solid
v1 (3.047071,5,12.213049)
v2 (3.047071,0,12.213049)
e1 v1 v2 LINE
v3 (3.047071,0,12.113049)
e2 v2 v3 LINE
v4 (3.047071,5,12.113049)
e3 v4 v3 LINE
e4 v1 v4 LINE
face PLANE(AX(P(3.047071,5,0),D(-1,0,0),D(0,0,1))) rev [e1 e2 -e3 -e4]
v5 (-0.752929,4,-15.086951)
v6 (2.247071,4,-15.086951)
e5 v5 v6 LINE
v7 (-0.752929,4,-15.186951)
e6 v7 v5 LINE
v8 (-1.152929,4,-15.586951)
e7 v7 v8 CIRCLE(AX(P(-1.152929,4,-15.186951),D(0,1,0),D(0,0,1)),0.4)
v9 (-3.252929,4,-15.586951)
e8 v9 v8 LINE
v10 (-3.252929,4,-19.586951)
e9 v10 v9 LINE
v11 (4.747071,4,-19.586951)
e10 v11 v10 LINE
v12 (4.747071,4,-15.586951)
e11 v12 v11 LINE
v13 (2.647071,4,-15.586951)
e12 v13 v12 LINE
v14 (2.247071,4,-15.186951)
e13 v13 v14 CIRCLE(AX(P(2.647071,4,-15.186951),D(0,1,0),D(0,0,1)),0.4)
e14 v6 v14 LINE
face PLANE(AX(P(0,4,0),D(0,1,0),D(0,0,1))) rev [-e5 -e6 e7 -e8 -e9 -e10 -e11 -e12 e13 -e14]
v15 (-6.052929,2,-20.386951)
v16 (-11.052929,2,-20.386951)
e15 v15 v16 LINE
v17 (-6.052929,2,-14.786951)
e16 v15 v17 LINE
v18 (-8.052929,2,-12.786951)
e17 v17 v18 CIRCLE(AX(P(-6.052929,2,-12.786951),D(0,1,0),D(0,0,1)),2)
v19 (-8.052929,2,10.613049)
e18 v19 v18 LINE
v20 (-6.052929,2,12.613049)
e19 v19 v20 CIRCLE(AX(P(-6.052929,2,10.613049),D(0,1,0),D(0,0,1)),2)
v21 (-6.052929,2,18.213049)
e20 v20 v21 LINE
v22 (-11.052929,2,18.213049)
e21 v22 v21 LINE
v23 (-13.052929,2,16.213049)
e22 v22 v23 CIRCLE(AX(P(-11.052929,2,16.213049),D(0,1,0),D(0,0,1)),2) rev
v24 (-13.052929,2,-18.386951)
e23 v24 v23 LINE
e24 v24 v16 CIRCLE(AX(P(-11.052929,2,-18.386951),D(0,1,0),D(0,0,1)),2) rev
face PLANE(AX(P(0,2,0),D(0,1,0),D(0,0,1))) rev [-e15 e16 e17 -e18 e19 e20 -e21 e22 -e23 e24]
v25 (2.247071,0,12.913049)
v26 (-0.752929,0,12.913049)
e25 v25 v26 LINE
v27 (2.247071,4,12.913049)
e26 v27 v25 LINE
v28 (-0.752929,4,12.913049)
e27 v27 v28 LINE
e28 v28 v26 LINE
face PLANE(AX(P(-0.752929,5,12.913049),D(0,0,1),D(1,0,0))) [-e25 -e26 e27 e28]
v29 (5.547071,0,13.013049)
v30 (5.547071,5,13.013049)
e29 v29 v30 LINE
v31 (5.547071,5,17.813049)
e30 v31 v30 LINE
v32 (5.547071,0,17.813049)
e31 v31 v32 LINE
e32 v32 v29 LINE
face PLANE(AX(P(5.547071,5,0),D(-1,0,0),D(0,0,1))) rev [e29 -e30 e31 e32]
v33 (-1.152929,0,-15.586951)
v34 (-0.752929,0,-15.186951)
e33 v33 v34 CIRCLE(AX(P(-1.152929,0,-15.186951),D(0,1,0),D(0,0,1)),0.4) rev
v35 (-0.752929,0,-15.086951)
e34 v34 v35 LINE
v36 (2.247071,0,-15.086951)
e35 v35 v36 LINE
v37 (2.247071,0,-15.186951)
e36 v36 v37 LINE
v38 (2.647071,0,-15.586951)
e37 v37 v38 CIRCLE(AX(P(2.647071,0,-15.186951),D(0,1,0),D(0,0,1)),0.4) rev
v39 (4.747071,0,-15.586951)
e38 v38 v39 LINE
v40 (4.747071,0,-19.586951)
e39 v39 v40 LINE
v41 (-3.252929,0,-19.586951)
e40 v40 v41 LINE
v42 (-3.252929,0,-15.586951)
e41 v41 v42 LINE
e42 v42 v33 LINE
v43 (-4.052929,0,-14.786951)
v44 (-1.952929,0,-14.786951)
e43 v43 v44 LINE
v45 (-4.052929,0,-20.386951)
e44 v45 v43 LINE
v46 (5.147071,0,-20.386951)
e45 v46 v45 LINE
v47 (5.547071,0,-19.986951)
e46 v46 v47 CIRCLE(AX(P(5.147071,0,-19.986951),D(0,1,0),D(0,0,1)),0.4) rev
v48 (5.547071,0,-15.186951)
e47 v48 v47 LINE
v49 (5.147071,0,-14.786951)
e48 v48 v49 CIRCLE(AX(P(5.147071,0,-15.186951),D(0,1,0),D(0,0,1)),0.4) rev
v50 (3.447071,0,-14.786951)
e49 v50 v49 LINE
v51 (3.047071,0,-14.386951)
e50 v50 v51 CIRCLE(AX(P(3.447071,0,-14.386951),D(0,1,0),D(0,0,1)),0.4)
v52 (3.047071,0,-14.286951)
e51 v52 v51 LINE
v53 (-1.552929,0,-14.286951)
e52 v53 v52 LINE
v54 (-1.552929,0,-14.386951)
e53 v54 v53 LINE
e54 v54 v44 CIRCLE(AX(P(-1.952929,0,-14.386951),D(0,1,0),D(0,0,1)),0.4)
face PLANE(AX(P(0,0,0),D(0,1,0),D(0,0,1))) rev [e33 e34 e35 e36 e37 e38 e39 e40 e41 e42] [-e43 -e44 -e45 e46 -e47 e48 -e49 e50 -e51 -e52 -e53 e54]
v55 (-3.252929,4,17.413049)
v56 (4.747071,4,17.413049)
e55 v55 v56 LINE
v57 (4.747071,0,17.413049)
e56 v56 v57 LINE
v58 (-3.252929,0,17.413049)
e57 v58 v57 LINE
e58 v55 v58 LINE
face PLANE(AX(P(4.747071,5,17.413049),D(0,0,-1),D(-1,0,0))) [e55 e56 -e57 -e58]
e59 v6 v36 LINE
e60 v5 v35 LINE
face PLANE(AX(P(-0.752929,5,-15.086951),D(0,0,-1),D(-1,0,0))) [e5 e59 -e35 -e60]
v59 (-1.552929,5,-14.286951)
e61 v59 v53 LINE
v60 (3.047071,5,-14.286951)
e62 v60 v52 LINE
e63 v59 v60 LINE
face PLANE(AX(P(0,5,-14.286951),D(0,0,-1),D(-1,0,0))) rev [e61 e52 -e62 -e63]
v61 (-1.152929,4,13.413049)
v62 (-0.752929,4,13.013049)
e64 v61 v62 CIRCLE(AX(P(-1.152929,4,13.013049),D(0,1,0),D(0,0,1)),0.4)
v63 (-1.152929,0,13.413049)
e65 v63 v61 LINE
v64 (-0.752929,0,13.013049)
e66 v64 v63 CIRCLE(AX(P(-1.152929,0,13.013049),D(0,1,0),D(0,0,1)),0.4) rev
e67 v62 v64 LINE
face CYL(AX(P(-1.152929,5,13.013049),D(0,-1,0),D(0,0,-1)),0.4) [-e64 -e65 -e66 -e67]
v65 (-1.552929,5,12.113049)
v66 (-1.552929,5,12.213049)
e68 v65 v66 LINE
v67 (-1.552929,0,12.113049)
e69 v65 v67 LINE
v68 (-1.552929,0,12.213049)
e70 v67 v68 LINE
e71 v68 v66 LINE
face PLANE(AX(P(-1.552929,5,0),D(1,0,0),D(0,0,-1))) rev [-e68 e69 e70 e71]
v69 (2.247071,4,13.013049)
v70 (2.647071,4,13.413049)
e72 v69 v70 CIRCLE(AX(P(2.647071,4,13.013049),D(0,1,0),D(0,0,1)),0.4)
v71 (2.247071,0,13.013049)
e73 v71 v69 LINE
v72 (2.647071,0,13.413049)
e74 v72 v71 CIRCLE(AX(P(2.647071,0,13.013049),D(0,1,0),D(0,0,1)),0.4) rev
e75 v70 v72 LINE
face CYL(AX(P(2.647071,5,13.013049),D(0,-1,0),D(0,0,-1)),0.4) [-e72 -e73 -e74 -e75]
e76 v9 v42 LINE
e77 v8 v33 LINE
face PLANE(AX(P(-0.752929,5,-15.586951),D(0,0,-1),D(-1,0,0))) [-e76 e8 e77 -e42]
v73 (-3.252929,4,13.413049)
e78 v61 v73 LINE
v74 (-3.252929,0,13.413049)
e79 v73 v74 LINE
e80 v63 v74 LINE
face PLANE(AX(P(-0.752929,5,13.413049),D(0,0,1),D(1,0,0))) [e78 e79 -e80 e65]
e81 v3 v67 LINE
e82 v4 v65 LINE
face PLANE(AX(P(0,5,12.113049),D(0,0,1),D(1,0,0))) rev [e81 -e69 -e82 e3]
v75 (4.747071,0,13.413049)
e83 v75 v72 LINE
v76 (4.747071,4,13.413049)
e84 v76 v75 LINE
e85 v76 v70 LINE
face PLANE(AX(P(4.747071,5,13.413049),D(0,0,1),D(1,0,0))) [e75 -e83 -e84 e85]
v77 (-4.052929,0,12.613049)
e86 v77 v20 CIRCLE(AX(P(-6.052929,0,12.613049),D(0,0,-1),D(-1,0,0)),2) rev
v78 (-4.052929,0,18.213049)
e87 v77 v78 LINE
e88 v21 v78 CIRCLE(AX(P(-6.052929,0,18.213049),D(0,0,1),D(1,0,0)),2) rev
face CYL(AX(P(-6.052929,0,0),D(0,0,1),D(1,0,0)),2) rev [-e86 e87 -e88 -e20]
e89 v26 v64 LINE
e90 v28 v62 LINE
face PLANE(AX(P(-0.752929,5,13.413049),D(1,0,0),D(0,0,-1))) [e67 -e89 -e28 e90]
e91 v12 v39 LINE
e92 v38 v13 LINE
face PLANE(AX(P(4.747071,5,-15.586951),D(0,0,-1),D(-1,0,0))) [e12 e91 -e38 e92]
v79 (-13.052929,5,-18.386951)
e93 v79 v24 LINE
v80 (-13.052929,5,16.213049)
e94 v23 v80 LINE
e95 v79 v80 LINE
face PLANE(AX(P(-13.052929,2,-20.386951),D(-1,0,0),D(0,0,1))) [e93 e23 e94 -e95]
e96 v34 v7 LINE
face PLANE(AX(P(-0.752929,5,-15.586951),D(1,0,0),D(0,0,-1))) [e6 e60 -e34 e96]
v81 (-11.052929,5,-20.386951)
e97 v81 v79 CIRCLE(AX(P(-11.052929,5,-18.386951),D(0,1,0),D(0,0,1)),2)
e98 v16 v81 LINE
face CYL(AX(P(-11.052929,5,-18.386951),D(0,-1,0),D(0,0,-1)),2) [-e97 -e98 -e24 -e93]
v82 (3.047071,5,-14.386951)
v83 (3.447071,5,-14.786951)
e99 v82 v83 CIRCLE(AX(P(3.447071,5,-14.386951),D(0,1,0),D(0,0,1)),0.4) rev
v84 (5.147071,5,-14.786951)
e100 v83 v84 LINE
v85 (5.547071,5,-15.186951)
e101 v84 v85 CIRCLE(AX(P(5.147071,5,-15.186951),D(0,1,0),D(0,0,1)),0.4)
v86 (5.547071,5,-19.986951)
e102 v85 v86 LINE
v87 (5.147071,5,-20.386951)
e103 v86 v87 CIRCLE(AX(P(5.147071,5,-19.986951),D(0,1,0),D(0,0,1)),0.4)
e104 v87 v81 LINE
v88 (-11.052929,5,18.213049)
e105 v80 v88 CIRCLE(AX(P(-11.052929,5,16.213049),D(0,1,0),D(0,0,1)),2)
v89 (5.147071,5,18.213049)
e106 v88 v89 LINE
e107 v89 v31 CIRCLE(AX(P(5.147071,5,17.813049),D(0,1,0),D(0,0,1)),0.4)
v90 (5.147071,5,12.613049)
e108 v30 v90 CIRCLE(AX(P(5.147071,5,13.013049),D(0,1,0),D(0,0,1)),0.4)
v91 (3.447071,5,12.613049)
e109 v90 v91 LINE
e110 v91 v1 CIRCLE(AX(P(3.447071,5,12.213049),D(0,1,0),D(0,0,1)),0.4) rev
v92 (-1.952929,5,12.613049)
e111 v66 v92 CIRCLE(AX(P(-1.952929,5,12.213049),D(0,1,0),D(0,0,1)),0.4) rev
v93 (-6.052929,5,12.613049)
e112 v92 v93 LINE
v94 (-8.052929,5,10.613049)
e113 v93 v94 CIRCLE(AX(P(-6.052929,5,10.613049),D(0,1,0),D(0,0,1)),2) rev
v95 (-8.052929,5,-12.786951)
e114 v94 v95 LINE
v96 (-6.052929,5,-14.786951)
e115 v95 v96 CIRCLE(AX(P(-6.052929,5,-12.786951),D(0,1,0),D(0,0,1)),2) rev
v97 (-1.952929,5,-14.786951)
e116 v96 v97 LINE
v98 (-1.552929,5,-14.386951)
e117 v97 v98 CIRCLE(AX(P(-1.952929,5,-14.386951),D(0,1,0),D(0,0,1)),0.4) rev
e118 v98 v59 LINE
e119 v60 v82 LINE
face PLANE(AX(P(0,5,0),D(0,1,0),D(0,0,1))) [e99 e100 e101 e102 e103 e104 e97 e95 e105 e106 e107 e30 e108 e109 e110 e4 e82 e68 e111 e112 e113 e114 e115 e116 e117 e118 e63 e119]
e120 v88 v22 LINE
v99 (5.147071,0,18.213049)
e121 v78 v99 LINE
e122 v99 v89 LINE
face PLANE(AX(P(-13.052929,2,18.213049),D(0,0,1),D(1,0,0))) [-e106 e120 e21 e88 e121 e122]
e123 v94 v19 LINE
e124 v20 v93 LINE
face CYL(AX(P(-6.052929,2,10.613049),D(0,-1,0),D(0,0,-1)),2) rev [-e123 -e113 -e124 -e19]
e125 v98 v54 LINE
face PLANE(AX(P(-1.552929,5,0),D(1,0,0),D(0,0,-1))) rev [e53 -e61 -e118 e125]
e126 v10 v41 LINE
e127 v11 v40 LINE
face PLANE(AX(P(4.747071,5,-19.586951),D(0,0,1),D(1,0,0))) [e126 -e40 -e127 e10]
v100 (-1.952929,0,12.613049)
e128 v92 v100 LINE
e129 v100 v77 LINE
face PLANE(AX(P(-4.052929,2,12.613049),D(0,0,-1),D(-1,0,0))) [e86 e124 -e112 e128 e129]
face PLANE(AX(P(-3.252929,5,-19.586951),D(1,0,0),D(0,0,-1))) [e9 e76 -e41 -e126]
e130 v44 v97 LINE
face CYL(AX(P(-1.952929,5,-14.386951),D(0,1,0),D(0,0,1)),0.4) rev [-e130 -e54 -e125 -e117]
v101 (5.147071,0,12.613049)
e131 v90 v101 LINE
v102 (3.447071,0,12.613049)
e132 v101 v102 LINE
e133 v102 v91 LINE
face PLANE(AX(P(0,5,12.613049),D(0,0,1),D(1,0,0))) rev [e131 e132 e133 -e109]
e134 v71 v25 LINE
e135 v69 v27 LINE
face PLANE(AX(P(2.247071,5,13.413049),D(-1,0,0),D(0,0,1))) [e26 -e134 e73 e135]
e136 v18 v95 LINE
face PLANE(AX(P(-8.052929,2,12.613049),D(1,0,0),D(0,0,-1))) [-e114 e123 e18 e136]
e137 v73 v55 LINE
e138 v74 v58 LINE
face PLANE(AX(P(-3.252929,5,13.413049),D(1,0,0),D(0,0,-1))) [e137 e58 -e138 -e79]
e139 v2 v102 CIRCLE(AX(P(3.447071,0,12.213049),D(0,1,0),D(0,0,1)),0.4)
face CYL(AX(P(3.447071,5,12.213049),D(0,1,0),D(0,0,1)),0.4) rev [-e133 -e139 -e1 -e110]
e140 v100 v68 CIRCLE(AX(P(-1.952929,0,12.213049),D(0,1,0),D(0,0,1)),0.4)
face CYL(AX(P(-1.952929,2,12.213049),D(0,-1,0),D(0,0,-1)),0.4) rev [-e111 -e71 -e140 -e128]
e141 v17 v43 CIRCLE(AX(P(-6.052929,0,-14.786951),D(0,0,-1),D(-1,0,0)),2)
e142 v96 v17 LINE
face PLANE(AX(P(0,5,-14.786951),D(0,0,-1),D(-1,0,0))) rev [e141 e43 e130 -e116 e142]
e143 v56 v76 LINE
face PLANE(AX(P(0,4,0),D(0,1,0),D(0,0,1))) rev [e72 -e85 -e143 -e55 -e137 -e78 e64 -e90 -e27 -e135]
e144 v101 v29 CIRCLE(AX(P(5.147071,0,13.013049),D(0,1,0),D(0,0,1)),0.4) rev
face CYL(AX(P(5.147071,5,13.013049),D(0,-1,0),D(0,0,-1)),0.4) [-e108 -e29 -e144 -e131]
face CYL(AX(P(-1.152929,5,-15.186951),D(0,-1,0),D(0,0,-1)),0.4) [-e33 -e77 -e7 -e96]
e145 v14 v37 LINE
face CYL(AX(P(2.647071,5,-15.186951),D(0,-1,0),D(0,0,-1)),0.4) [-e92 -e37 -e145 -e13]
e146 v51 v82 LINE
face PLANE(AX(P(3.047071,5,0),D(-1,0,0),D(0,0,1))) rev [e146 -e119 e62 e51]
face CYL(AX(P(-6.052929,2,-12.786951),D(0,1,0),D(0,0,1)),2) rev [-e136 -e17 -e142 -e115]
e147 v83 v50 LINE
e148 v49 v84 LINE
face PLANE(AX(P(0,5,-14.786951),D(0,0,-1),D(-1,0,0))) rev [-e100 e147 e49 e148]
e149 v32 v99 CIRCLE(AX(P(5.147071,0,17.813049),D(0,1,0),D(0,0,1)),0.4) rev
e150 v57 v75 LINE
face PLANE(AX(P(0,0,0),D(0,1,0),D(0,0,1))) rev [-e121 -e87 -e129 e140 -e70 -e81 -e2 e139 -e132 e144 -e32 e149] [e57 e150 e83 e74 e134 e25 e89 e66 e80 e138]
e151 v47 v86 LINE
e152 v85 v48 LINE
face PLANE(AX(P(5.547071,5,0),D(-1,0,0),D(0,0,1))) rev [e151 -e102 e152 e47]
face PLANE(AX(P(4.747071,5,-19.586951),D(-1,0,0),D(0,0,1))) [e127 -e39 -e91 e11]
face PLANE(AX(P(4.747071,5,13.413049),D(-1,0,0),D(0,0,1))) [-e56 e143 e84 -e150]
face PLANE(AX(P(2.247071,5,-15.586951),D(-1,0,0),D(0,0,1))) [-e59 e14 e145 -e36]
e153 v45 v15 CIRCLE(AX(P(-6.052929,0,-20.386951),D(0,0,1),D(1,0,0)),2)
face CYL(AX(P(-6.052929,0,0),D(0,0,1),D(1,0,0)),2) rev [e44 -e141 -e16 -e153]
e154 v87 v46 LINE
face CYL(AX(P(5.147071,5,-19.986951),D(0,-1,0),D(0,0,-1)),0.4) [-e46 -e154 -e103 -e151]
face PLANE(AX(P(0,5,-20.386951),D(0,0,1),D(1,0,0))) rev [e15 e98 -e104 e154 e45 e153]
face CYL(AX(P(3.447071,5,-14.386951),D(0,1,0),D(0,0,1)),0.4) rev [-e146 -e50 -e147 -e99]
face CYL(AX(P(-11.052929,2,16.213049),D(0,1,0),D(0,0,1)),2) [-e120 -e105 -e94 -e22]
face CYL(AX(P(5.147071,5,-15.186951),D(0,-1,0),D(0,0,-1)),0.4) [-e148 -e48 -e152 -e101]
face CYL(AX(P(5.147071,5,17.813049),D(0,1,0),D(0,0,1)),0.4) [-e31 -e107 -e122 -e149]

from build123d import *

# Parameters (mm, degrees)
EXTRUDE_1_DEPTH   = 5
EXTRUDE_1_2_DEPTH = 5
EXTRUDE_1_3_DEPTH = 3
SKETCH_3_W        = 8
SKETCH_3_H        = 4.5
EXTRUDE_2_DEPTH   = 1
FILLET_1_R        = 2
FILLET_2_R        = 0.4
FILLET_3_R        = 0.4


with BuildPart() as part:
    # Эскиз1 → Extrude 1 (new body)
    with BuildSketch(Plane(origin=(0, 0, 0), x_dir=(1, 0, 0), z_dir=(0, 1, 0))):
        Polygon((3.047071049, 14.786951222), (5.547071049, 14.786951222), (5.547071049, 20.386951222), (-4.052928951, 20.386951222), (-4.052928951, 14.786951222), (-1.552928951, 14.786951222), (-1.552928951, 14.286951222), (3.047071049, 14.286951222), align=None)
        Polygon((2.247071049, 15.586951222), (4.747071049, 15.586951222), (4.747071049, 19.586951222), (-3.252928951, 19.586951222), (-3.252928951, 15.586951222), (-0.752928951, 15.586951222), (-0.752928951, 15.086951222), (2.247071049, 15.086951222), align=None, mode=Mode.SUBTRACT)
    extrude(amount=EXTRUDE_1_DEPTH)



with BuildPart() as body_2:
    # Эскиз1 → Extrude 1 2 (new body)
    with BuildSketch(Plane(origin=(0, 0, 0), x_dir=(1, 0, 0), z_dir=(0, 1, 0))):
        Polygon((-4.052928951, -12.613048778), (-4.052928951, -18.213048778), (5.547071049, -18.213048778), (5.547071049, -12.613048778), (3.047071049, -12.613048778), (3.047071049, -12.113048778), (-1.552928951, -12.113048778), (-1.552928951, -12.613048778), align=None)
        Polygon((-3.252928951, -13.413048778), (-3.252928951, -17.413048778), (4.747071049, -17.413048778), (4.747071049, -13.413048778), (2.247071049, -13.413048778), (2.247071049, -12.913048778), (-0.752928951, -12.913048778), (-0.752928951, -13.413048778), align=None, mode=Mode.SUBTRACT)
    extrude(amount=EXTRUDE_1_2_DEPTH)


with BuildPart() as part_1:
    add(part.part)

    add(body_2.part)  # Extrude 1 3 merges body 2
    # Эскиз2 → Extrude 1 3 (add)
    with BuildSketch(Plane(origin=(0, 5, 0), x_dir=(1, 0, 0), z_dir=(0, 1, 0))):
        Polygon((-4.052928951, 20.386951222), (-13.052928951, 20.386951222), (-13.052928951, -18.213048778), (-4.052928951, -18.213048778), (-4.052928951, -12.613048778), (-8.052928951, -12.613048778), (-8.052928951, 14.786951222), (-4.052928951, 14.786951222), align=None)
    extrude(amount=-EXTRUDE_1_3_DEPTH)

    # Эскиз3 → Бобышка-Вытянуть2 (add)
    with BuildSketch(Plane(origin=(0, 5, 0), x_dir=(1, 0, 0), z_dir=(0, 1, 0))):
        with Locations((0.747071049, 17.336951222)):
            Rectangle(SKETCH_3_W, SKETCH_3_H)
        with Locations((0.747071049, -15.163048778)):
            Rectangle(SKETCH_3_W, SKETCH_3_H)
    extrude(amount=-EXTRUDE_2_DEPTH)

    # Скругление1
    fillet_1_edges = [part_1.edges().sort_by_distance(p)[0] for p in [
        (-4.052928951, 2, -17.586951222),
        (-4.052928951, 2, 15.413048778),
        (-8.052928951, 3.5, 12.613048778),
        (-8.052928951, 3.5, -14.786951222),
        (-13.052928951, 3.5, -20.386951222),
        (-13.052928951, 3.5, 18.213048778),
    ]]
    fillet(fillet_1_edges, radius=FILLET_1_R - 0.0001)  # a hair under: the kernel refuses the full size

    # Скругление2
    fillet_2_edges = [part_1.edges().sort_by_distance(p)[0] for p in [
        (5.547071049, 2.5, -14.786951222),
        (5.547071049, 2.5, -20.386951222),
        (5.547071049, 2.5, 18.213048778),
        (5.547071049, 2.5, 12.613048778),
    ]]
    fillet(fillet_2_edges, radius=FILLET_2_R)

    # Скругление3
    fillet_3_edges = [part_1.edges().sort_by_distance(p)[0] for p in [
        (-0.752928951, 2, -15.586951222),
        (3.047071049, 2.5, -14.786951222),
        (-1.552928951, 2.5, -14.786951222),
        (-0.752928951, 2, 13.413048778),
        (2.247071049, 2, 13.413048778),
        (3.047071049, 2.5, 12.613048778),
        (-1.552928951, 2.5, 12.613048778),
        (2.247071049, 2, -15.586951222),
    ]]
    fillet(fillet_3_edges, radius=FILLET_3_R)


solid = part_1.part
